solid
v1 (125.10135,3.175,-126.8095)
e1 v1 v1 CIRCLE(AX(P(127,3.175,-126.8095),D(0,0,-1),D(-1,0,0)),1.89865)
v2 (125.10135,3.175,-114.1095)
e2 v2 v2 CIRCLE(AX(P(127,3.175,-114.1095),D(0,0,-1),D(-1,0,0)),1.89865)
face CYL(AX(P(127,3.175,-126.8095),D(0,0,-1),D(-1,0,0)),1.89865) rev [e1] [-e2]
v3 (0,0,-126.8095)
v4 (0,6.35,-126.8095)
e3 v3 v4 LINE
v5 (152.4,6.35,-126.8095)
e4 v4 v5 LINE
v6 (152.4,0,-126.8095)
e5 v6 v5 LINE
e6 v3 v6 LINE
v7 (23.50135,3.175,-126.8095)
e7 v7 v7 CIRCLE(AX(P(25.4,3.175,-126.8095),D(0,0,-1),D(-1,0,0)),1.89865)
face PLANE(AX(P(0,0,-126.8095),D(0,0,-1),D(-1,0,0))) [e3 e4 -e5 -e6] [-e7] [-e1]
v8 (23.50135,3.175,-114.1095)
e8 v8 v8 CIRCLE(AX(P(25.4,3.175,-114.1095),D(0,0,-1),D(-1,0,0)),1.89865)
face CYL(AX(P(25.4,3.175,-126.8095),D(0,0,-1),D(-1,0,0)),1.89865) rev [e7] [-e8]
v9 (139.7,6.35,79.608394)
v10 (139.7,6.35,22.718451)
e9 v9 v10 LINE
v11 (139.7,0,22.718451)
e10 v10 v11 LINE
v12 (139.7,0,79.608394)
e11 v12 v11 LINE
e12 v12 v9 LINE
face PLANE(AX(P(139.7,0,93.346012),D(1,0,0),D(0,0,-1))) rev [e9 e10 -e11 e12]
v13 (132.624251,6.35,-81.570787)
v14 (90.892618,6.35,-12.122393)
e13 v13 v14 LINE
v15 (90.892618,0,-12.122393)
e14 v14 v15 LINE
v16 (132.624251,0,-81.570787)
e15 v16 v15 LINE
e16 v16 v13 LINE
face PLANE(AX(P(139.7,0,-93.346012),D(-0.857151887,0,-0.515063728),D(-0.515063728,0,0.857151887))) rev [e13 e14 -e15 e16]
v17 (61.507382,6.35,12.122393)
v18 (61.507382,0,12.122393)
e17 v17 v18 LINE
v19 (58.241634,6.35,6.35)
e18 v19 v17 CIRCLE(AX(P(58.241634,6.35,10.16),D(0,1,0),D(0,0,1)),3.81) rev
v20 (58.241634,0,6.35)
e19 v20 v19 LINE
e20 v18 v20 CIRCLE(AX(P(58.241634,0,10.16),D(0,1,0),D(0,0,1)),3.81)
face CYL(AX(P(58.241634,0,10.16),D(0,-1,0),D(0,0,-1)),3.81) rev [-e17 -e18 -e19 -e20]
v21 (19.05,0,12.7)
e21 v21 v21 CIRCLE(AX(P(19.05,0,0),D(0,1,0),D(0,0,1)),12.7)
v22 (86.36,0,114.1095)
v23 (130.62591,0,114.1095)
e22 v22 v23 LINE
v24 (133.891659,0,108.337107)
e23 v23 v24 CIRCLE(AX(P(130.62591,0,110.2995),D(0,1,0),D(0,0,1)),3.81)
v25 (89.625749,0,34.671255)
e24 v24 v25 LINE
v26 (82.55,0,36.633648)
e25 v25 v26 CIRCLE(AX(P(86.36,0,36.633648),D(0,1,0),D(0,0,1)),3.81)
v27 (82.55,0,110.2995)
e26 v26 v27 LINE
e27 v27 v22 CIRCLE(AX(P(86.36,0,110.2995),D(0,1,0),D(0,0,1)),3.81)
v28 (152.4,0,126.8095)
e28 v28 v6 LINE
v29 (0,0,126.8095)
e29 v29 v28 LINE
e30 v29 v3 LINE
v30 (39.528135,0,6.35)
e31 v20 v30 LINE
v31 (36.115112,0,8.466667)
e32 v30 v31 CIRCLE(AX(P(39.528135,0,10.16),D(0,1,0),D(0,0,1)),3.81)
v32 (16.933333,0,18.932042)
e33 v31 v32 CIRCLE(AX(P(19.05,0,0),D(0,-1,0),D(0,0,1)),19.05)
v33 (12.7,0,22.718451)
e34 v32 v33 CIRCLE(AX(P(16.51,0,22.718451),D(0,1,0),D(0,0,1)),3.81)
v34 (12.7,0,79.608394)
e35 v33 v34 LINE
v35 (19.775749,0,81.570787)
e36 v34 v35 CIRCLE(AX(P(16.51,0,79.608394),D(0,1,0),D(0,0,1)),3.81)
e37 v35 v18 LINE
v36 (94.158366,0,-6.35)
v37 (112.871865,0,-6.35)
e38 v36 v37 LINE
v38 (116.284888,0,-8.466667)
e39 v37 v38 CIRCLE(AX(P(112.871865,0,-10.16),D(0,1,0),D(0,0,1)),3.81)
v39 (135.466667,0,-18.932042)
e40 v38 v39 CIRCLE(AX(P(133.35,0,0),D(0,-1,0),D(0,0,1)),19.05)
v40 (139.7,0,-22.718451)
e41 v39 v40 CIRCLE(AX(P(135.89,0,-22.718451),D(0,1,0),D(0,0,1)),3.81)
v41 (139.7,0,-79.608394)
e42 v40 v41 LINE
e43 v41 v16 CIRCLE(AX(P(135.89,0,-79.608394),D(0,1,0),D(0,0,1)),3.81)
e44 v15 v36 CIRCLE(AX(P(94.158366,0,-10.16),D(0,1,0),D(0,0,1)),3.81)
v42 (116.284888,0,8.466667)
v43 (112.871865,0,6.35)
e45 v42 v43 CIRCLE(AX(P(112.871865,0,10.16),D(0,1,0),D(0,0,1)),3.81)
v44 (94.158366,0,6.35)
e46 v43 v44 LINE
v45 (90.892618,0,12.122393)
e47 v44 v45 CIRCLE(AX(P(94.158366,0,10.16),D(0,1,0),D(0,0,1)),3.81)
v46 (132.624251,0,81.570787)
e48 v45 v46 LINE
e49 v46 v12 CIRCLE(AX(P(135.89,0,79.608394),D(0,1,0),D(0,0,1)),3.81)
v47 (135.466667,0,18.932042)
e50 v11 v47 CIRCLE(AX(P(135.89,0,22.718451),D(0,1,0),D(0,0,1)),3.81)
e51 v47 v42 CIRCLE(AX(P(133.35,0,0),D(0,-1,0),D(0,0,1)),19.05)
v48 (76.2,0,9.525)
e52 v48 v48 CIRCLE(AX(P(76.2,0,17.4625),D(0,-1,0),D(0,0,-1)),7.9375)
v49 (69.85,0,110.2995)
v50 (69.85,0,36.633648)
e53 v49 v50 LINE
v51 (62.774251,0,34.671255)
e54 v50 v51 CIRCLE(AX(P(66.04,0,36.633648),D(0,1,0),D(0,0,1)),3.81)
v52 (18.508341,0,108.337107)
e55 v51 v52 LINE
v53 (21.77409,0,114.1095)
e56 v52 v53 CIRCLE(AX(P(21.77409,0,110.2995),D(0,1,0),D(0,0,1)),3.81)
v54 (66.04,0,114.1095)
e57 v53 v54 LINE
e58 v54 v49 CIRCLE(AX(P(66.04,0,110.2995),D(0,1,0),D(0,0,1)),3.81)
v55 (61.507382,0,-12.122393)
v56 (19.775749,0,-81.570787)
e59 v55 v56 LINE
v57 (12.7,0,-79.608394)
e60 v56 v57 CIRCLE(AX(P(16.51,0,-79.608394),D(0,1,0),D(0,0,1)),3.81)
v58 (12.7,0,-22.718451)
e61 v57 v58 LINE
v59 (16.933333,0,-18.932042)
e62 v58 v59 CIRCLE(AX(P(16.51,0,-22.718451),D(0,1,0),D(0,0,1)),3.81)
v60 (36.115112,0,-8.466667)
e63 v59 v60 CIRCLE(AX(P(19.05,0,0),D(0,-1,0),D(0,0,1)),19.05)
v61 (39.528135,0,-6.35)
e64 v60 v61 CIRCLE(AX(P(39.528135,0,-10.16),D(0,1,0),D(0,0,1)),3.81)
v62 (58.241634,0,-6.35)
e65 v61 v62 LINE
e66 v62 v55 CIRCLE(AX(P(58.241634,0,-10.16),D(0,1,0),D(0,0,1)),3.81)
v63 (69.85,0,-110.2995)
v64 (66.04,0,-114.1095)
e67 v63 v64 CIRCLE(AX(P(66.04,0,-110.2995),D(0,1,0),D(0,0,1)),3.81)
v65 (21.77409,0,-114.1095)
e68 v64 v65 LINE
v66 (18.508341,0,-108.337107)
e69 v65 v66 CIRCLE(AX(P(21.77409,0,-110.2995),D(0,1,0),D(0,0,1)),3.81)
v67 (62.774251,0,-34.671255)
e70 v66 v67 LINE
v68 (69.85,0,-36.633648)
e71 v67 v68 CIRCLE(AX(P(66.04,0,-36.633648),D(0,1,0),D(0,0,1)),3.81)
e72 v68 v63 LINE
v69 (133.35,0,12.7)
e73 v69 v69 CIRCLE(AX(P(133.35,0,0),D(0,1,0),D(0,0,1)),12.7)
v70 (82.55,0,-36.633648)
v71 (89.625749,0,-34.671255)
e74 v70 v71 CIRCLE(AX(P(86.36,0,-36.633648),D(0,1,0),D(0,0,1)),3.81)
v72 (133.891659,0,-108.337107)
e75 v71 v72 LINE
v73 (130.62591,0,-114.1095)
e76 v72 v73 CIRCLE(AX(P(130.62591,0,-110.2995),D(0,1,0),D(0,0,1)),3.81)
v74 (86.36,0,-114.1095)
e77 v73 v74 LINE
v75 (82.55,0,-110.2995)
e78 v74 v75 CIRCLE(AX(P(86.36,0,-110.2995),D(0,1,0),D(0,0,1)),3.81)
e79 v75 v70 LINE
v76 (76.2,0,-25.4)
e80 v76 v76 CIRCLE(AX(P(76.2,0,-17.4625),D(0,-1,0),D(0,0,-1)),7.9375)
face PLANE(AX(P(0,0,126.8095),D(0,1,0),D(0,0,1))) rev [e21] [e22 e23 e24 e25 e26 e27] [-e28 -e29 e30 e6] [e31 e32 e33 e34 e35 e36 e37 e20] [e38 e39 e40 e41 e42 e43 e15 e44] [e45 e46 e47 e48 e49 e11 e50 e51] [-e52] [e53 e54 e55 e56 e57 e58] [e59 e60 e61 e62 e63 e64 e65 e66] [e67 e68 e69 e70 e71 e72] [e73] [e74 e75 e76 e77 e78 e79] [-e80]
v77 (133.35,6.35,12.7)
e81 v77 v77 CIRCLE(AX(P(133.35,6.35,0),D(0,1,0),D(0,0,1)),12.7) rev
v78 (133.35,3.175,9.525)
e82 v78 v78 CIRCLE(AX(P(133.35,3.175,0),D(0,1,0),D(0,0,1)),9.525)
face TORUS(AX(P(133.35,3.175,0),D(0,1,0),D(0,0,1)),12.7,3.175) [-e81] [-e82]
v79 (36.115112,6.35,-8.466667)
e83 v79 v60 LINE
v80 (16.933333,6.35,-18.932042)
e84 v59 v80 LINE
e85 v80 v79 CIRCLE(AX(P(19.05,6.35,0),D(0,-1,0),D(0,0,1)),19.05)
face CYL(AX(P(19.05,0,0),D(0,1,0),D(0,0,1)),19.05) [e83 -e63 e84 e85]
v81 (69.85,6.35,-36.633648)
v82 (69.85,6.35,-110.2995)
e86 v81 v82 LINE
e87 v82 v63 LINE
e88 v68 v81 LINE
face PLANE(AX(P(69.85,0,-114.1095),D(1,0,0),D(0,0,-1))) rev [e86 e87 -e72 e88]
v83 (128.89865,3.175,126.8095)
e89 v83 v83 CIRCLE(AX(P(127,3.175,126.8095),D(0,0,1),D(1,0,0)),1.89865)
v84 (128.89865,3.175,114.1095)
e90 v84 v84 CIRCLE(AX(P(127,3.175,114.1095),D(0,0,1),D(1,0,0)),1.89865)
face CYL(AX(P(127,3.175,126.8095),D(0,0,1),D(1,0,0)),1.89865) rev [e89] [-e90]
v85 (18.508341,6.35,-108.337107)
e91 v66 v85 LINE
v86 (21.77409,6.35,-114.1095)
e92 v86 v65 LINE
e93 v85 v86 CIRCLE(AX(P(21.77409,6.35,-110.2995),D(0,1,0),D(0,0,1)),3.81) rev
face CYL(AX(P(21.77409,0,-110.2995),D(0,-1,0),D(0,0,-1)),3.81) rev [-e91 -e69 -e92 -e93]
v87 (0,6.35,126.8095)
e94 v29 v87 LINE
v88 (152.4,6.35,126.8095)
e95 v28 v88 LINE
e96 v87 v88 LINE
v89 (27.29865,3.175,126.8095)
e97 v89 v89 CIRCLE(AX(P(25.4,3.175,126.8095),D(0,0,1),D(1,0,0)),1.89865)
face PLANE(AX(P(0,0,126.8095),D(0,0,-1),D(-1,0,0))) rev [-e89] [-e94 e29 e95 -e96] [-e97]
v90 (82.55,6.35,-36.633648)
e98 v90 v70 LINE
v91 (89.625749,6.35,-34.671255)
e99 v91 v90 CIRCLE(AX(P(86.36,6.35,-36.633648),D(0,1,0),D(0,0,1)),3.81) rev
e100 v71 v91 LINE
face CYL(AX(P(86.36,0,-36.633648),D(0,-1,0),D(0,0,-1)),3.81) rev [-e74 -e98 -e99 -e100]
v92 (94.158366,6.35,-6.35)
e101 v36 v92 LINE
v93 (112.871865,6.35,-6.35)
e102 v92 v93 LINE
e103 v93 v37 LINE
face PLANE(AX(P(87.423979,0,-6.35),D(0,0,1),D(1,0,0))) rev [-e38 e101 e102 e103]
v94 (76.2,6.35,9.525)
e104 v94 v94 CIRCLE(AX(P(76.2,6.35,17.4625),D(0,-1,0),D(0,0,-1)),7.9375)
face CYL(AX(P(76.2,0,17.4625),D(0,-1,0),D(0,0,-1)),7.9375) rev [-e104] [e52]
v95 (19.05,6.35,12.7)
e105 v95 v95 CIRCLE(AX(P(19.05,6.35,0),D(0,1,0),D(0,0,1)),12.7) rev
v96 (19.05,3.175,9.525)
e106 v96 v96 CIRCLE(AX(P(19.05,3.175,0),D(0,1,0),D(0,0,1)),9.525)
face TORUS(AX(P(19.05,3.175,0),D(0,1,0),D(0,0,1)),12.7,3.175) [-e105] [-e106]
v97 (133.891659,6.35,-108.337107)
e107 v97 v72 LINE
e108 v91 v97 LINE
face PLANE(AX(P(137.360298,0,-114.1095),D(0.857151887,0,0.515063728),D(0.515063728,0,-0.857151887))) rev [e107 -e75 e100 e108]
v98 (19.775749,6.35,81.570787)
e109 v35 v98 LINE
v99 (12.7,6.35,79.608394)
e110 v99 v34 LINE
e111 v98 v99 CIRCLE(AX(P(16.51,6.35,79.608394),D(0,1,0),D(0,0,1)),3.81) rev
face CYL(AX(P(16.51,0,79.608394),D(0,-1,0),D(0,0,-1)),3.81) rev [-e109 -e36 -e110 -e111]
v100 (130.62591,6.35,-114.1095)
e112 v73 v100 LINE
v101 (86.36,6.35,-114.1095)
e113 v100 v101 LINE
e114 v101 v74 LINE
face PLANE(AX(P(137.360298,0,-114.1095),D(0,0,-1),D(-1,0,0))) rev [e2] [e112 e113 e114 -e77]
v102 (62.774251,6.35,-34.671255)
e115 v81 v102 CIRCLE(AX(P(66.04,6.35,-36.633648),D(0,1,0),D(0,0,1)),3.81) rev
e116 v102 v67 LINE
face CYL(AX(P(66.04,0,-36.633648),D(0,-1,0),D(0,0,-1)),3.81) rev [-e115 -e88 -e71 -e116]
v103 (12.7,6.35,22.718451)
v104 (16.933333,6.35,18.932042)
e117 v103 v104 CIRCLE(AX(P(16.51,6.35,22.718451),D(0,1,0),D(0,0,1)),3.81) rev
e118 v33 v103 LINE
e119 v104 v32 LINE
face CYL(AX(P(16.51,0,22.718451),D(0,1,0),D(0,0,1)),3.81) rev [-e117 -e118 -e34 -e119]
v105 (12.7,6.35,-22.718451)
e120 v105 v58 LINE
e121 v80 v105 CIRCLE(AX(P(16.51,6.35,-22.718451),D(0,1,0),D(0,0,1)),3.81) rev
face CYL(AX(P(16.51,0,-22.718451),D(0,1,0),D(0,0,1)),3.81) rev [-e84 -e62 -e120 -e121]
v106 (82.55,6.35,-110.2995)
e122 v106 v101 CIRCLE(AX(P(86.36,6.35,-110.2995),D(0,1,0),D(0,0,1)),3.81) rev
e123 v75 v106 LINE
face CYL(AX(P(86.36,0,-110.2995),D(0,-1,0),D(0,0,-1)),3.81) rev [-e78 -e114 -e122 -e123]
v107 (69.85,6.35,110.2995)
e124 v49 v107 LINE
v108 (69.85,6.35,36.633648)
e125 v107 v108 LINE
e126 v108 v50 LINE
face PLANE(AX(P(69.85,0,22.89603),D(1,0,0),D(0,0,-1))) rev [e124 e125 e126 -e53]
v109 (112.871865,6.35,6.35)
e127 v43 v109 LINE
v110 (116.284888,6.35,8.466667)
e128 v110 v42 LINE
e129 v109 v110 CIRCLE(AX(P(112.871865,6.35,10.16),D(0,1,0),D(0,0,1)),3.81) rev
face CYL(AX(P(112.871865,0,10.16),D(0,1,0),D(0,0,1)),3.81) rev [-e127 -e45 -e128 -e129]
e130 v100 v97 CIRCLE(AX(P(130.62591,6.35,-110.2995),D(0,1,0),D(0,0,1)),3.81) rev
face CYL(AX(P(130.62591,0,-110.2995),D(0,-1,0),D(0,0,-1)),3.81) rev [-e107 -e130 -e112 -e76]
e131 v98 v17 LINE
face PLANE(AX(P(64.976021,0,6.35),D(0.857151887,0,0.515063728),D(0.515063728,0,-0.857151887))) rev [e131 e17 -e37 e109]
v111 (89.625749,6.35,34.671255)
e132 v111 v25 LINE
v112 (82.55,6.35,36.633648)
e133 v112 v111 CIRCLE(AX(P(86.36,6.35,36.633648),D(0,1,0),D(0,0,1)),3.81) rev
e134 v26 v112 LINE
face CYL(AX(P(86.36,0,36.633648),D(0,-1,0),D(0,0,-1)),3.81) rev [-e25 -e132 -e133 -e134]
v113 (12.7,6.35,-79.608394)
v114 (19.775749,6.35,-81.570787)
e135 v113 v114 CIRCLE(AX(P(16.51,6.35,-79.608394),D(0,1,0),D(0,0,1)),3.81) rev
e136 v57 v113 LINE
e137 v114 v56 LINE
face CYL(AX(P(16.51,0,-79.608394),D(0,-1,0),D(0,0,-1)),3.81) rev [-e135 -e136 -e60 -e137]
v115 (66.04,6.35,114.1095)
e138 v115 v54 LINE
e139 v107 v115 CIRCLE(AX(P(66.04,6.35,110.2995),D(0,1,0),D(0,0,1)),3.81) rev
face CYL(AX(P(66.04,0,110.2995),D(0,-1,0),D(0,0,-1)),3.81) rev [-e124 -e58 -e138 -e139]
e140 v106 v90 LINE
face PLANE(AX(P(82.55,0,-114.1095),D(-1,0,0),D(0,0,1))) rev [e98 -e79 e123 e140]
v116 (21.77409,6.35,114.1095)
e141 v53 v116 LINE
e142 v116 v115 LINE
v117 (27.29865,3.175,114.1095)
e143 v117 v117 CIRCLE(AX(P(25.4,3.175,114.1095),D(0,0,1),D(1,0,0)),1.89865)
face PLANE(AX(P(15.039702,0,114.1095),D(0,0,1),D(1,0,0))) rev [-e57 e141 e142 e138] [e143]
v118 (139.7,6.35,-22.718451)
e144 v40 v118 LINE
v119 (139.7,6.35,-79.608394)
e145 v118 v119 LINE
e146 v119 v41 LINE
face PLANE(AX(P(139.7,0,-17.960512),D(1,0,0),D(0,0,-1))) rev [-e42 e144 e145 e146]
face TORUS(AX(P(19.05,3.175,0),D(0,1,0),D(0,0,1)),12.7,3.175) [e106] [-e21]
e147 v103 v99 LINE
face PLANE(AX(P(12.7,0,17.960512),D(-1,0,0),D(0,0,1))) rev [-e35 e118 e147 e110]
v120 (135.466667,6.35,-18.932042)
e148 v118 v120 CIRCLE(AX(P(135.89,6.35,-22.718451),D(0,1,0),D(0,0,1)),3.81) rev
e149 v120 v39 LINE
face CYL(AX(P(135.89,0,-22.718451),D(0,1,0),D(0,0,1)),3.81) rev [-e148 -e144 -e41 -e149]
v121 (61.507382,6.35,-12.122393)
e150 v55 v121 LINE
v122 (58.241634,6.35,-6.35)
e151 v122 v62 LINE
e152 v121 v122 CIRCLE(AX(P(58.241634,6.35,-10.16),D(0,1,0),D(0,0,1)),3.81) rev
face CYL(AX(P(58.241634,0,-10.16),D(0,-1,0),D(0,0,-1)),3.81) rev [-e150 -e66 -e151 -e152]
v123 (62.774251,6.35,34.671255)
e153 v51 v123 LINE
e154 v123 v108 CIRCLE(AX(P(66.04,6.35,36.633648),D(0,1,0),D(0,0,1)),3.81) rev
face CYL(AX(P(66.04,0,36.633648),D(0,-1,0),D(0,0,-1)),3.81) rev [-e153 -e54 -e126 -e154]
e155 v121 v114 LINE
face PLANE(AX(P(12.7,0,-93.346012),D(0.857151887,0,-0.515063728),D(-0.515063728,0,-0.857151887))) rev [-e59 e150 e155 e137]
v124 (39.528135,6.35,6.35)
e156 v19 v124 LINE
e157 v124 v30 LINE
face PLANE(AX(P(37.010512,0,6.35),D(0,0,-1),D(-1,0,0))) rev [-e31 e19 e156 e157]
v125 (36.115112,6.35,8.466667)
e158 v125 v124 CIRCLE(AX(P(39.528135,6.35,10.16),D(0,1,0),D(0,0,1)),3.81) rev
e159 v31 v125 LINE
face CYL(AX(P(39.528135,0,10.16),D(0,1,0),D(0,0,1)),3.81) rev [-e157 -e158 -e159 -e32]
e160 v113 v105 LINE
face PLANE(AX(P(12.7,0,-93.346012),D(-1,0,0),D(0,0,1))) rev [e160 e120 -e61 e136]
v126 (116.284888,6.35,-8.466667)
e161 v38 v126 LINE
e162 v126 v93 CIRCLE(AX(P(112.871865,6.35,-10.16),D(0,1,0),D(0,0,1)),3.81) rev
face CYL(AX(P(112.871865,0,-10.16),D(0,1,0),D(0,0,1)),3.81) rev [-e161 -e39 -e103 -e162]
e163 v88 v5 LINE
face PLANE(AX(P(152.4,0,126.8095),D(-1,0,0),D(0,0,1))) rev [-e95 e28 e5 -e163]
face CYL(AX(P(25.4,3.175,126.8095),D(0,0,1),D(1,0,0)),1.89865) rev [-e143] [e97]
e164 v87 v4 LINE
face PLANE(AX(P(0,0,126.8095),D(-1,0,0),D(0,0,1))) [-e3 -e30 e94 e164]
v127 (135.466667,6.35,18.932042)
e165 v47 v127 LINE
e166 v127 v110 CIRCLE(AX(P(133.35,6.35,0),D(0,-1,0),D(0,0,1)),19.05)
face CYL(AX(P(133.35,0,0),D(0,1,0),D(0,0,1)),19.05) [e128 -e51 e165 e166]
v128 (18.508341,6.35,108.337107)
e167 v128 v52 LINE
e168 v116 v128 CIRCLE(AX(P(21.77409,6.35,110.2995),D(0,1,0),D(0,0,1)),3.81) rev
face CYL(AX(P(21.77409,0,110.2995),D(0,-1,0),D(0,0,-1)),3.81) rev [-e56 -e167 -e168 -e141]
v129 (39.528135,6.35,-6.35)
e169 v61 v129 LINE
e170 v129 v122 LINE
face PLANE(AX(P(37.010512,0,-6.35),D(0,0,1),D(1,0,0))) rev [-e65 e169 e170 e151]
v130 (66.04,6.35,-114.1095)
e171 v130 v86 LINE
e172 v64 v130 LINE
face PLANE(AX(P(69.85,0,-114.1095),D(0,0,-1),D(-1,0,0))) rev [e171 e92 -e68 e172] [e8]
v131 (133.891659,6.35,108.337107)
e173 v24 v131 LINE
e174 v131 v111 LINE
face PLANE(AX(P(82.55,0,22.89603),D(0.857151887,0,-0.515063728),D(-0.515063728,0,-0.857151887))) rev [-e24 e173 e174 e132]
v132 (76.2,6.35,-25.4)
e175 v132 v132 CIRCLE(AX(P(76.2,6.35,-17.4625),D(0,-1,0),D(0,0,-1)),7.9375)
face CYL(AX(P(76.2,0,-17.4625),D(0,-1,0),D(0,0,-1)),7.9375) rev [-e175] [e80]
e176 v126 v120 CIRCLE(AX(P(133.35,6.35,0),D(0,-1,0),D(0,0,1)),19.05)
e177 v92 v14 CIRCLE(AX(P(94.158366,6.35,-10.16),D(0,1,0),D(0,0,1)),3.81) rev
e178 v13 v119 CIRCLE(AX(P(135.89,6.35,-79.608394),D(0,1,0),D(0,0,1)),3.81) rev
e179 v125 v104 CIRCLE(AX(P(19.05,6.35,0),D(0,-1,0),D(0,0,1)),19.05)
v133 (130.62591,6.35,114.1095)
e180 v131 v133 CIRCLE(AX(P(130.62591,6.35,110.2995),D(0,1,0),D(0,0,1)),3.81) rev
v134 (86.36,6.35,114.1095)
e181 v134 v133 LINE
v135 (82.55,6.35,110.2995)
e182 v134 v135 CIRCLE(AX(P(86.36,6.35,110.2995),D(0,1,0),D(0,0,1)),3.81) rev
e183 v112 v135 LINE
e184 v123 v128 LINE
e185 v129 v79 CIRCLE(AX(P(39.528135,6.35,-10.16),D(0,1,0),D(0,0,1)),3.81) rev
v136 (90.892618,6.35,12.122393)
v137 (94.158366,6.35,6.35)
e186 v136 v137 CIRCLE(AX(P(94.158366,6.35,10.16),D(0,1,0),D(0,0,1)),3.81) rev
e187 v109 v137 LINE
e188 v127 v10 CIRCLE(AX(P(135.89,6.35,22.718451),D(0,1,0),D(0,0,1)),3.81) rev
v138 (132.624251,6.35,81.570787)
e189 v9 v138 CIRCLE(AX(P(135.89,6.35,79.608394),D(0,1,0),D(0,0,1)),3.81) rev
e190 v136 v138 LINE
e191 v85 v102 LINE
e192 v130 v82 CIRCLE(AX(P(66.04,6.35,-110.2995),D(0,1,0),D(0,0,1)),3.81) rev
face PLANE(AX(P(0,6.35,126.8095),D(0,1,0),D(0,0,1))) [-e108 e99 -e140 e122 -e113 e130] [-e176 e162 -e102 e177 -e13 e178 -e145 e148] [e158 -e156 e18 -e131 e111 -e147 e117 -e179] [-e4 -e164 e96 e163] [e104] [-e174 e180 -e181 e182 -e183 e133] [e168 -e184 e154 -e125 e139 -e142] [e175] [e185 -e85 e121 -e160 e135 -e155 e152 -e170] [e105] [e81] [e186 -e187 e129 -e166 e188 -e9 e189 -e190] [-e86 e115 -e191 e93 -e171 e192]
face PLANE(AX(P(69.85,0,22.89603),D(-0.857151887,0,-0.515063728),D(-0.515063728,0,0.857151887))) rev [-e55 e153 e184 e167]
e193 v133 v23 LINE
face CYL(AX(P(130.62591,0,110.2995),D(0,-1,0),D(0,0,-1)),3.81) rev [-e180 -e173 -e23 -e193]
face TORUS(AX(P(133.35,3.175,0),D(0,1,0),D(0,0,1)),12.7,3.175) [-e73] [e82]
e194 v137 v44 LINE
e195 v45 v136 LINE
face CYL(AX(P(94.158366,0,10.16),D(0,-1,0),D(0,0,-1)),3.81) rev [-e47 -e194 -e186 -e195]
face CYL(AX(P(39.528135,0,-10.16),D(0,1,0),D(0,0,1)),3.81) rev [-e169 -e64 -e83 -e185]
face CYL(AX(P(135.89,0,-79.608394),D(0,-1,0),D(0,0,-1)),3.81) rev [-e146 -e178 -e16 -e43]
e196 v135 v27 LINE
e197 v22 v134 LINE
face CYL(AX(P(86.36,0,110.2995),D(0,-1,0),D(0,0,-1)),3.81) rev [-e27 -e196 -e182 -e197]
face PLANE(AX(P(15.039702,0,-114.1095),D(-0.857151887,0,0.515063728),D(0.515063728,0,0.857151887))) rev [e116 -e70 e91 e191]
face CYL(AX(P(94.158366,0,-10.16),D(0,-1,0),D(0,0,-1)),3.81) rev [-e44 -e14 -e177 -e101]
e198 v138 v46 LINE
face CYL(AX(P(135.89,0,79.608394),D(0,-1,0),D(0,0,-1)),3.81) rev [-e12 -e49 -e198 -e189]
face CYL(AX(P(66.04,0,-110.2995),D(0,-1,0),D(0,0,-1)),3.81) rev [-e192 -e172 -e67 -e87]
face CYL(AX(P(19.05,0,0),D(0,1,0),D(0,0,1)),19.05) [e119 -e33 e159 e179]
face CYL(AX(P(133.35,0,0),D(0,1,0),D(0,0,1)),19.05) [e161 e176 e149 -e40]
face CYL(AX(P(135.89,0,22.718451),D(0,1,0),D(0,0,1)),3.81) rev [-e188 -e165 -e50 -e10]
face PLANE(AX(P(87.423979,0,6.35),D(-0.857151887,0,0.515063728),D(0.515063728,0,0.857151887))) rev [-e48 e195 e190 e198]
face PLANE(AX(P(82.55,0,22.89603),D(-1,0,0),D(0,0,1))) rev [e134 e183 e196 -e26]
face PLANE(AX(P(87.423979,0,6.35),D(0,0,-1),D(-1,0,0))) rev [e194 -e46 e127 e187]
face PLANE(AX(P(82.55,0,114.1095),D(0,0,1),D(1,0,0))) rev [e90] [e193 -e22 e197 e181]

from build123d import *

# Parameters (mm, degrees)
SKETCH1_W                    = 152.4
SKETCH1_H                    = 6.35
BOSS_EXTRUDE1_DEPTH          = 126.8095
F_3_4_0_75_DIAMETER_HOLE1_D  = 19.05
CUT_EXTRUDE1_DEPTH           = 199.360106348
FILLET1_R                    = 3.81
FILLET4_R                    = 3.175
F_5_8_0_625_DIAMETER_HOLE1_D = 15.875
F_10_24_TAPPED_HOLE1_D       = 3.7973
F_10_24_TAPPED_HOLE1_DEPTH   = 19.05
F_10_24_TAPPED_HOLE1_TIP     = 1.140824014
F_10_24_TAPPED_HOLE2_D       = 3.7973
F_10_24_TAPPED_HOLE2_DEPTH   = 19.05
F_10_24_TAPPED_HOLE2_TIP     = 1.140824014


with BuildPart() as part:
    # Sketch1 → Boss-Extrude1 (new, symmetric)
    with BuildSketch(Plane.XY):
        with Locations((76.2, 3.175)):
            Rectangle(SKETCH1_W, SKETCH1_H)
    extrude(amount=BOSS_EXTRUDE1_DEPTH, both=True)

    # 3/4 (0.75) Diameter Hole1 (through all)
    with Locations(Plane(origin=(0, 6.35, 0), x_dir=(1, 0, 0), z_dir=(0, 1, 0))):
        with Locations((19.05, 0), (133.35, 0)):
            Hole(F_3_4_0_75_DIAMETER_HOLE1_D / 2)

    # Sketch4 → Cut-Extrude1 (cut, through all)
    with BuildSketch(Plane(origin=(0, 6.35, 0), x_dir=(1, 0, 0), z_dir=(0, 1, 0))):
        with BuildLine():
            Line((37.010512242, -6.35), (64.976021122, -6.35))
            Line((64.976021122, -6.35), (12.7, -93.346011817))
            Line((12.7, -93.346011817), (12.7, -17.960512242))
            ThreePointArc((12.7, -17.960512242), (27.259871939, -17.190128061), (37.010512242, -6.35))
        make_face()
        with BuildLine():
            Line((12.7, 93.346011817), (64.976021122, 6.35))
            Line((64.976021122, 6.35), (37.010512242, 6.35))
            ThreePointArc((37.010512242, 6.35), (27.259871939, 17.190128061), (12.7, 17.960512242))
            Line((12.7, 17.960512242), (12.7, 93.346011817))
        make_face()
        Polygon((137.360297537, 114.1095), (82.55, 22.896029849), (82.55, 114.1095), align=None)
        Polygon((15.039702463, 114.1095), (69.85, 22.896029849), (69.85, 114.1095), align=None)
        with BuildLine():
            Line((139.7, 93.346011817), (87.423978878, 6.35))
            Line((87.423978878, 6.35), (115.389487758, 6.35))
            ThreePointArc((115.389487758, 6.35), (125.140128061, 17.190128061), (139.7, 17.960512242))
            Line((139.7, 17.960512242), (139.7, 93.346011817))
        make_face()
        Polygon((15.039702463, -114.1095), (69.85, -114.1095), (69.85, -22.896029849), align=None)
        with BuildLine():
            Line((139.7, -93.346011817), (139.7, -17.960512242))
            ThreePointArc((139.7, -17.960512242), (125.140128061, -17.190128061), (115.389487758, -6.35))
            Line((115.389487758, -6.35), (87.423978878, -6.35))
            Line((87.423978878, -6.35), (139.7, -93.346011817))
        make_face()
        Polygon((82.55, -22.896029849), (137.360297537, -114.1095), (82.55, -114.1095), align=None)
    extrude(amount=-CUT_EXTRUDE1_DEPTH, mode=Mode.SUBTRACT)

    # Fillet1
    fillet1_edges = [part.edges().sort_by_distance(p)[0] for p in [
        (64.976021122, 3.175, 6.35),
        (12.7, 3.175, 93.346011817),
        (12.7, 3.175, 17.960512242),
        (37.010512242, 3.175, 6.35),
        (139.7, 3.175, -93.346011817),
        (139.7, 3.175, -17.960512242),
        (115.389487758, 3.175, -6.35),
        (87.423978878, 3.175, -6.35),
        (115.389487758, 3.175, 6.35),
        (139.7, 3.175, 17.960512242),
        (139.7, 3.175, 93.346011817),
        (87.423978878, 3.175, 6.35),
        (12.7, 3.175, -17.960512242),
        (12.7, 3.175, -93.346011817),
        (64.976021122, 3.175, -6.35),
        (37.010512242, 3.175, -6.35),
        (15.039702463, 3.175, 114.1095),
        (69.85, 3.175, 22.896029849),
        (69.85, 3.175, 114.1095),
        (137.360297537, 3.175, 114.1095),
        (82.55, 3.175, 114.1095),
        (82.55, 3.175, 22.896029849),
        (82.55, 3.175, -114.1095),
        (137.360297537, 3.175, -114.1095),
        (82.55, 3.175, -22.896029849),
        (15.039702463, 3.175, -114.1095),
        (69.85, 3.175, -114.1095),
        (69.85, 3.175, -22.896029849),
    ]]
    fillet(fillet1_edges, radius=FILLET1_R)

    # Fillet4
    fillet4_edges = [part.edges().sort_by_distance(p)[0] for p in [
        (142.875, 6.35, 0),
        (142.875, 0, 0),
        (28.575, 6.35, 0),
        (28.575, 0, 0),
    ]]
    fillet(fillet4_edges, radius=FILLET4_R - 0.0001)  # a hair under: the kernel refuses the full size

    # 5/8 (0.625) Diameter Hole1 (through all)
    with Locations(Plane(origin=(0, 0, 0), x_dir=(-1, 0, 0), z_dir=(0, -1, 0))):
        with Locations((-76.2, 17.4625), (-76.2, -17.4625)):
            Hole(F_5_8_0_625_DIAMETER_HOLE1_D / 2)

    # #10-24 Tapped Hole1
    with Locations(Plane.XY.offset(126.8095)):
        with Locations((127, 3.175), (25.4, 3.175)):
            Hole(F_10_24_TAPPED_HOLE1_D / 2, depth=F_10_24_TAPPED_HOLE1_DEPTH)
            with Locations((0, 0, -(F_10_24_TAPPED_HOLE1_DEPTH + F_10_24_TAPPED_HOLE1_TIP / 2))):  # 118° drill point
                Cone(0, F_10_24_TAPPED_HOLE1_D / 2, F_10_24_TAPPED_HOLE1_TIP, mode=Mode.SUBTRACT)

    # #10-24 Tapped Hole2
    with Locations(Plane(origin=(0, 0, -126.8095), x_dir=(-1, 0, 0), z_dir=(0, 0, -1))):
        with Locations((-25.4, 3.175), (-127, 3.175)):
            Hole(F_10_24_TAPPED_HOLE2_D / 2, depth=F_10_24_TAPPED_HOLE2_DEPTH)
            with Locations((0, 0, -(F_10_24_TAPPED_HOLE2_DEPTH + F_10_24_TAPPED_HOLE2_TIP / 2))):  # 118° drill point
                Cone(0, F_10_24_TAPPED_HOLE2_D / 2, F_10_24_TAPPED_HOLE2_TIP, mode=Mode.SUBTRACT)


solid = part.part
